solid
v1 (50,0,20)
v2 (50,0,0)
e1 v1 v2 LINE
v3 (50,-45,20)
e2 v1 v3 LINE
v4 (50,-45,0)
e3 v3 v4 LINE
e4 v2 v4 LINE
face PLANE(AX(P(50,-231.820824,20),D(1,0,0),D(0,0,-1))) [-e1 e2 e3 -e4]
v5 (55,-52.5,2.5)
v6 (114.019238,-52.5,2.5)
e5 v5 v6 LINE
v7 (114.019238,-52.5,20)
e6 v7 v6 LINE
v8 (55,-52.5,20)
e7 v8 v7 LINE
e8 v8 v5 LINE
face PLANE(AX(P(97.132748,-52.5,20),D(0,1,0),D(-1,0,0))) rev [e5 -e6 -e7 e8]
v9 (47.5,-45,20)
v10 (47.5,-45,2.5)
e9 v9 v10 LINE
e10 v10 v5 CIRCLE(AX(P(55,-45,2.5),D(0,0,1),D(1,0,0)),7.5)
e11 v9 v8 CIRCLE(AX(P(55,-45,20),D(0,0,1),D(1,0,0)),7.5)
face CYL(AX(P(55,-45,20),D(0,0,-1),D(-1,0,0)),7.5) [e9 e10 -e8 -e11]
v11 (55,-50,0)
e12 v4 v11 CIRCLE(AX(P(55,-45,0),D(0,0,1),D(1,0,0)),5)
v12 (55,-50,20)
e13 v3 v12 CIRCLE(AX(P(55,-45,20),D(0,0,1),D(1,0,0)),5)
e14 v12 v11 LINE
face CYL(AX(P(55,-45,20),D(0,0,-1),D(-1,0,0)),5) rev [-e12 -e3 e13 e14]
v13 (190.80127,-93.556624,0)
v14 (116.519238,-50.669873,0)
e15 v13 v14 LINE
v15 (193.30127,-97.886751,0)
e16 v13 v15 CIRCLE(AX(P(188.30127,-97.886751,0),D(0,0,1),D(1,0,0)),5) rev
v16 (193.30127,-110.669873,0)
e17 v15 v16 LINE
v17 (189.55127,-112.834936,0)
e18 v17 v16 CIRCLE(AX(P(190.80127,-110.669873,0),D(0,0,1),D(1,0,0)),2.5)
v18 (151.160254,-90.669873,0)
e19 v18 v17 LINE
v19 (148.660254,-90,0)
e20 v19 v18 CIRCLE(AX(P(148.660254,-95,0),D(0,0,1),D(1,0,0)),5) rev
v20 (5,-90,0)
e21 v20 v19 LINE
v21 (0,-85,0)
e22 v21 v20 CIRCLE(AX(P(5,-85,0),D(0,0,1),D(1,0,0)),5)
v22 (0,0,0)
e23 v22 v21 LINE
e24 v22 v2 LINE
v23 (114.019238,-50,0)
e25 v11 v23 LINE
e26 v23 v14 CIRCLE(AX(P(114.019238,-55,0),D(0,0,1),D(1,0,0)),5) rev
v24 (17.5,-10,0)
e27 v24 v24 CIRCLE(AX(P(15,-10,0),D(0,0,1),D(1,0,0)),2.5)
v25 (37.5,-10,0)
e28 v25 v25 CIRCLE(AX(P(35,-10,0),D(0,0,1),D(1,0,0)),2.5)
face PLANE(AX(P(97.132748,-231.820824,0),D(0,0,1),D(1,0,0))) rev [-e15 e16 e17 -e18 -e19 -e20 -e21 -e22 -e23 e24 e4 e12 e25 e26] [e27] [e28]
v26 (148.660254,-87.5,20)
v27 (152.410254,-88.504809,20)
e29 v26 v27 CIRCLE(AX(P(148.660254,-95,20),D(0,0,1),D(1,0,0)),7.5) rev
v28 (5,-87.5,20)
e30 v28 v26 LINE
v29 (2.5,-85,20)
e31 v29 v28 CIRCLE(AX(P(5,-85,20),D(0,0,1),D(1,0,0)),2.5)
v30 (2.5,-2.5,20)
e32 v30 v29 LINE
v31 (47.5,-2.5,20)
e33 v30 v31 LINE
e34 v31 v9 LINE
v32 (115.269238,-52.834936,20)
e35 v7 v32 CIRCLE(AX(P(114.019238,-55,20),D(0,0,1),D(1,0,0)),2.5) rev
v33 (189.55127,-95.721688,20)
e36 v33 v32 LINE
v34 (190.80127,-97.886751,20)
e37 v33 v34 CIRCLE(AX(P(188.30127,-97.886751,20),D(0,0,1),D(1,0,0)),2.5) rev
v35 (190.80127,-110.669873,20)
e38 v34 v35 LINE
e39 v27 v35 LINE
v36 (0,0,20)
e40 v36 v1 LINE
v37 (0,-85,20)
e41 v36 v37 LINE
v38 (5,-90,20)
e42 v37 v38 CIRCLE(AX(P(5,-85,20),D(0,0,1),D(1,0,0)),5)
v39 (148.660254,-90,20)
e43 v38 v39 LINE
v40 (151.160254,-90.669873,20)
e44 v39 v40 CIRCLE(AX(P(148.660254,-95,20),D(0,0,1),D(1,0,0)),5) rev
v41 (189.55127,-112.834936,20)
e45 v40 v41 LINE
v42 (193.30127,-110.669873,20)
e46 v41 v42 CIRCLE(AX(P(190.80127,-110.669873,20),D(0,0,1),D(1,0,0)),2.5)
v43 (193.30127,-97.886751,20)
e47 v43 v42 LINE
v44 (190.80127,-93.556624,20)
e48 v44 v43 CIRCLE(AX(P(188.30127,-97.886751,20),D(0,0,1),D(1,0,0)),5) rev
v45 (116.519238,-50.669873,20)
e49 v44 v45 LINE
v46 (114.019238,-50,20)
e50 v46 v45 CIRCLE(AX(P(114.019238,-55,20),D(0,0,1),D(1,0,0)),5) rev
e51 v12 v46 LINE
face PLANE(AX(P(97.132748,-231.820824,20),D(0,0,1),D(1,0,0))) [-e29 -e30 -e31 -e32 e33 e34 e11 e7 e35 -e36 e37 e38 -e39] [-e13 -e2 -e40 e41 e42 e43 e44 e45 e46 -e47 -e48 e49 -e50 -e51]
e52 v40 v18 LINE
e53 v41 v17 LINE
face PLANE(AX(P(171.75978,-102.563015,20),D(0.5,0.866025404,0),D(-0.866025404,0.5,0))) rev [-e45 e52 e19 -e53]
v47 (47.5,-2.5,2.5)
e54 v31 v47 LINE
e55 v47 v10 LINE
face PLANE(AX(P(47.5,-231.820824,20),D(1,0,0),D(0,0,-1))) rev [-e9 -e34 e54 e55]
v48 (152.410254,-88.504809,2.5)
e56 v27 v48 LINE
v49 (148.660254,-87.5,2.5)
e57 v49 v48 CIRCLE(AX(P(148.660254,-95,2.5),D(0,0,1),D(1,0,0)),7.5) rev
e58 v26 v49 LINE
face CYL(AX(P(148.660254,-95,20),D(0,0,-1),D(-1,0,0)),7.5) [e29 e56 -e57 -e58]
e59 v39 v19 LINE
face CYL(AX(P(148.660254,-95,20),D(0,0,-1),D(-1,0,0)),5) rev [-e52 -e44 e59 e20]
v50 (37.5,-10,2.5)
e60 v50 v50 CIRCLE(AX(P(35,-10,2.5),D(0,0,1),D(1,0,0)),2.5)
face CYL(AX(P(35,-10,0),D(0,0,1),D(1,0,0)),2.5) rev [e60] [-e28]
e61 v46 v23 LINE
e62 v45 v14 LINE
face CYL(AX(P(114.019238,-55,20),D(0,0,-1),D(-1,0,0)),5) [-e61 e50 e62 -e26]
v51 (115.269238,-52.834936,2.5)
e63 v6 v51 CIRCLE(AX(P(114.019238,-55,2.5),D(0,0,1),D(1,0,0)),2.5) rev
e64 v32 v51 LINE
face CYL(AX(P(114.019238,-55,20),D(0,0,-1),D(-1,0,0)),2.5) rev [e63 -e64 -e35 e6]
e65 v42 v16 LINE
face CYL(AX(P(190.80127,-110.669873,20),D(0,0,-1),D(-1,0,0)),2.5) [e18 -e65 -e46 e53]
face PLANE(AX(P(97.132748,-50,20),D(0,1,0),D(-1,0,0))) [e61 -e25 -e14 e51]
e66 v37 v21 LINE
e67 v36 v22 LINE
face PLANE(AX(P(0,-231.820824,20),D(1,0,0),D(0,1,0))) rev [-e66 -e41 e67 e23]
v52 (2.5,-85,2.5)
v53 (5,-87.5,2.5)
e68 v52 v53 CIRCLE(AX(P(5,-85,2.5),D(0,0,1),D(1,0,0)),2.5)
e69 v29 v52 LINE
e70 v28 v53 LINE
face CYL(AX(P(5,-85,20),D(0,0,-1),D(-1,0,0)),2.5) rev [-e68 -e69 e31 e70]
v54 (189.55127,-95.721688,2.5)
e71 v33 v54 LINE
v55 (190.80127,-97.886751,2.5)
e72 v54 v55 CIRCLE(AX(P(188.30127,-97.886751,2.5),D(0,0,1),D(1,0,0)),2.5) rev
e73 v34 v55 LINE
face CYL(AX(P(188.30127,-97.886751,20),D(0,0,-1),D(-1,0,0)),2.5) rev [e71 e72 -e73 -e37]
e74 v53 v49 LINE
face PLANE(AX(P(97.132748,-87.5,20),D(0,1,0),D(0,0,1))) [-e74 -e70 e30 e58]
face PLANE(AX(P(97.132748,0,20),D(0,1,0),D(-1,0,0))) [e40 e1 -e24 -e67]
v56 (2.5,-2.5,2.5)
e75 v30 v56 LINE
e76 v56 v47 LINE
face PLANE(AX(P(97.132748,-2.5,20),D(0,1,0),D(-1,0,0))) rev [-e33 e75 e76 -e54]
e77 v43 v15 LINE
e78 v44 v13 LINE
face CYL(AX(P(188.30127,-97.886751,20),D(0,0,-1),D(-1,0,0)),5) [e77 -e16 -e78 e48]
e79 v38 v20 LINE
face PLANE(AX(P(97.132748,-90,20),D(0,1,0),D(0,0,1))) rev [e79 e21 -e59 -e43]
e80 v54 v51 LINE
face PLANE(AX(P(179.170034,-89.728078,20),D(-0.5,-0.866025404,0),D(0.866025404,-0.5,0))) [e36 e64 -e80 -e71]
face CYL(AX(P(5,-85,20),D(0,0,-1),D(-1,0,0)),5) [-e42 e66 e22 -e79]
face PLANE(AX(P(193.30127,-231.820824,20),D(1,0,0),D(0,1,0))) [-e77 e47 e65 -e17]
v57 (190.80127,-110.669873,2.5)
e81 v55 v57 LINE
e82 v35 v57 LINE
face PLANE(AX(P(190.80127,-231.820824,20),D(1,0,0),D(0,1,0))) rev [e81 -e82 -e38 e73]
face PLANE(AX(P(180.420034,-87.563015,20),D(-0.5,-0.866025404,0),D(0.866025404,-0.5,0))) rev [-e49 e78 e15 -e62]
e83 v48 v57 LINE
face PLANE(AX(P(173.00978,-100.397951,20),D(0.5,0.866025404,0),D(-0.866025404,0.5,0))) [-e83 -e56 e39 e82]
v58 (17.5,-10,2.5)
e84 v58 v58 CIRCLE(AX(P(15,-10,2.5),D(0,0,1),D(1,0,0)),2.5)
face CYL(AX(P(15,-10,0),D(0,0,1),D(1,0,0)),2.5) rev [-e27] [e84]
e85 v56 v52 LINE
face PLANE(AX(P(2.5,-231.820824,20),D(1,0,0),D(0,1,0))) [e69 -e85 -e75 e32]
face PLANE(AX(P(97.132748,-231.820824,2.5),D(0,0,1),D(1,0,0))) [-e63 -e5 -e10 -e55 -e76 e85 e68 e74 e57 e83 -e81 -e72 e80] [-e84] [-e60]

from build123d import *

# Parameters (mm, degrees)
EXTRUDE1_DEPTH = 20
SHELL1_START   = 2.5
SHELL1_DEPTH   = 17.5
SKETCH2_R      = 2.5
EXTRUDE2_DEPTH = 225.675435256


# Read off the part's stored shape, not the designer's step: Shell1
with BuildPart() as part:
    # Sketch1 → Extrude1 (new body)
    with BuildSketch(Plane.XY):
        with BuildLine():
            Line((0, 0), (0, -85))
            ThreePointArc((0, -85), (1.464466094, -88.535533906), (5, -90))
            Line((5, -90), (148.660254038, -90))
            ThreePointArc((148.660254038, -90), (149.954349263, -90.170370869), (151.160254038, -90.669872981))
            Line((151.160254038, -90.669872981), (189.551270189, -112.834936491))
            ThreePointArc((189.551270189, -112.834936491), (192.051270189, -112.834936491), (193.301270189, -110.669872981))
            Line((193.301270189, -110.669872981), (193.301270189, -97.886751346))
            ThreePointArc((193.301270189, -97.886751346), (192.631397208, -95.386751346), (190.801270189, -93.556624327))
            Line((190.801270189, -93.556624327), (116.519237886, -50.669872981))
            ThreePointArc((116.519237886, -50.669872981), (115.313333112, -50.170370869), (114.019237886, -50))
            Line((114.019237886, -50), (55, -50))
            ThreePointArc((55, -50), (51.464466094, -48.535533906), (50, -45))
            Line((50, -45), (50, 0))
            Line((50, 0), (0, 0))
        make_face()
    extrude(amount=EXTRUDE1_DEPTH)

    # Shell1 outline → Shell1 (cut)
    with BuildSketch(Plane.XY.offset(SHELL1_START)):
        with BuildLine():
            Line((2.5, -2.5), (2.5, -85))
            ThreePointArc((2.5, -85), (3.232233047, -86.767766953), (5, -87.5))
            Line((5, -87.5), (148.660254038, -87.5))
            ThreePointArc((148.660254038, -87.5), (150.601396876, -87.755556303), (152.410254038, -88.504809472))
            Line((152.410254038, -88.504809472), (190.801270189, -110.669872981))
            Line((190.801270189, -110.669872981), (190.801270189, -97.886751346))
            ThreePointArc((190.801270189, -97.886751346), (190.466333699, -96.636751346), (189.551270189, -95.721687836))
            Line((189.551270189, -95.721687836), (115.269237886, -52.834936491))
            ThreePointArc((115.269237886, -52.834936491), (114.666285499, -52.585185434), (114.019237886, -52.5))
            Line((114.019237886, -52.5), (55, -52.5))
            ThreePointArc((55, -52.5), (49.696699141, -50.303300859), (47.5, -45))
            Line((47.5, -45), (47.5, -2.5))
            Line((47.5, -2.5), (2.5, -2.5))
        make_face()
    extrude(amount=SHELL1_DEPTH, mode=Mode.SUBTRACT)

    # Sketch2 → Extrude2 (cut, through all)
    with BuildSketch(Plane.XY.offset(2.5)):
        with Locations((15, -10)):
            Circle(SKETCH2_R)
        with Locations((35, -10)):
            Circle(SKETCH2_R)
    extrude(amount=-EXTRUDE2_DEPTH, mode=Mode.SUBTRACT)


solid = part.part
